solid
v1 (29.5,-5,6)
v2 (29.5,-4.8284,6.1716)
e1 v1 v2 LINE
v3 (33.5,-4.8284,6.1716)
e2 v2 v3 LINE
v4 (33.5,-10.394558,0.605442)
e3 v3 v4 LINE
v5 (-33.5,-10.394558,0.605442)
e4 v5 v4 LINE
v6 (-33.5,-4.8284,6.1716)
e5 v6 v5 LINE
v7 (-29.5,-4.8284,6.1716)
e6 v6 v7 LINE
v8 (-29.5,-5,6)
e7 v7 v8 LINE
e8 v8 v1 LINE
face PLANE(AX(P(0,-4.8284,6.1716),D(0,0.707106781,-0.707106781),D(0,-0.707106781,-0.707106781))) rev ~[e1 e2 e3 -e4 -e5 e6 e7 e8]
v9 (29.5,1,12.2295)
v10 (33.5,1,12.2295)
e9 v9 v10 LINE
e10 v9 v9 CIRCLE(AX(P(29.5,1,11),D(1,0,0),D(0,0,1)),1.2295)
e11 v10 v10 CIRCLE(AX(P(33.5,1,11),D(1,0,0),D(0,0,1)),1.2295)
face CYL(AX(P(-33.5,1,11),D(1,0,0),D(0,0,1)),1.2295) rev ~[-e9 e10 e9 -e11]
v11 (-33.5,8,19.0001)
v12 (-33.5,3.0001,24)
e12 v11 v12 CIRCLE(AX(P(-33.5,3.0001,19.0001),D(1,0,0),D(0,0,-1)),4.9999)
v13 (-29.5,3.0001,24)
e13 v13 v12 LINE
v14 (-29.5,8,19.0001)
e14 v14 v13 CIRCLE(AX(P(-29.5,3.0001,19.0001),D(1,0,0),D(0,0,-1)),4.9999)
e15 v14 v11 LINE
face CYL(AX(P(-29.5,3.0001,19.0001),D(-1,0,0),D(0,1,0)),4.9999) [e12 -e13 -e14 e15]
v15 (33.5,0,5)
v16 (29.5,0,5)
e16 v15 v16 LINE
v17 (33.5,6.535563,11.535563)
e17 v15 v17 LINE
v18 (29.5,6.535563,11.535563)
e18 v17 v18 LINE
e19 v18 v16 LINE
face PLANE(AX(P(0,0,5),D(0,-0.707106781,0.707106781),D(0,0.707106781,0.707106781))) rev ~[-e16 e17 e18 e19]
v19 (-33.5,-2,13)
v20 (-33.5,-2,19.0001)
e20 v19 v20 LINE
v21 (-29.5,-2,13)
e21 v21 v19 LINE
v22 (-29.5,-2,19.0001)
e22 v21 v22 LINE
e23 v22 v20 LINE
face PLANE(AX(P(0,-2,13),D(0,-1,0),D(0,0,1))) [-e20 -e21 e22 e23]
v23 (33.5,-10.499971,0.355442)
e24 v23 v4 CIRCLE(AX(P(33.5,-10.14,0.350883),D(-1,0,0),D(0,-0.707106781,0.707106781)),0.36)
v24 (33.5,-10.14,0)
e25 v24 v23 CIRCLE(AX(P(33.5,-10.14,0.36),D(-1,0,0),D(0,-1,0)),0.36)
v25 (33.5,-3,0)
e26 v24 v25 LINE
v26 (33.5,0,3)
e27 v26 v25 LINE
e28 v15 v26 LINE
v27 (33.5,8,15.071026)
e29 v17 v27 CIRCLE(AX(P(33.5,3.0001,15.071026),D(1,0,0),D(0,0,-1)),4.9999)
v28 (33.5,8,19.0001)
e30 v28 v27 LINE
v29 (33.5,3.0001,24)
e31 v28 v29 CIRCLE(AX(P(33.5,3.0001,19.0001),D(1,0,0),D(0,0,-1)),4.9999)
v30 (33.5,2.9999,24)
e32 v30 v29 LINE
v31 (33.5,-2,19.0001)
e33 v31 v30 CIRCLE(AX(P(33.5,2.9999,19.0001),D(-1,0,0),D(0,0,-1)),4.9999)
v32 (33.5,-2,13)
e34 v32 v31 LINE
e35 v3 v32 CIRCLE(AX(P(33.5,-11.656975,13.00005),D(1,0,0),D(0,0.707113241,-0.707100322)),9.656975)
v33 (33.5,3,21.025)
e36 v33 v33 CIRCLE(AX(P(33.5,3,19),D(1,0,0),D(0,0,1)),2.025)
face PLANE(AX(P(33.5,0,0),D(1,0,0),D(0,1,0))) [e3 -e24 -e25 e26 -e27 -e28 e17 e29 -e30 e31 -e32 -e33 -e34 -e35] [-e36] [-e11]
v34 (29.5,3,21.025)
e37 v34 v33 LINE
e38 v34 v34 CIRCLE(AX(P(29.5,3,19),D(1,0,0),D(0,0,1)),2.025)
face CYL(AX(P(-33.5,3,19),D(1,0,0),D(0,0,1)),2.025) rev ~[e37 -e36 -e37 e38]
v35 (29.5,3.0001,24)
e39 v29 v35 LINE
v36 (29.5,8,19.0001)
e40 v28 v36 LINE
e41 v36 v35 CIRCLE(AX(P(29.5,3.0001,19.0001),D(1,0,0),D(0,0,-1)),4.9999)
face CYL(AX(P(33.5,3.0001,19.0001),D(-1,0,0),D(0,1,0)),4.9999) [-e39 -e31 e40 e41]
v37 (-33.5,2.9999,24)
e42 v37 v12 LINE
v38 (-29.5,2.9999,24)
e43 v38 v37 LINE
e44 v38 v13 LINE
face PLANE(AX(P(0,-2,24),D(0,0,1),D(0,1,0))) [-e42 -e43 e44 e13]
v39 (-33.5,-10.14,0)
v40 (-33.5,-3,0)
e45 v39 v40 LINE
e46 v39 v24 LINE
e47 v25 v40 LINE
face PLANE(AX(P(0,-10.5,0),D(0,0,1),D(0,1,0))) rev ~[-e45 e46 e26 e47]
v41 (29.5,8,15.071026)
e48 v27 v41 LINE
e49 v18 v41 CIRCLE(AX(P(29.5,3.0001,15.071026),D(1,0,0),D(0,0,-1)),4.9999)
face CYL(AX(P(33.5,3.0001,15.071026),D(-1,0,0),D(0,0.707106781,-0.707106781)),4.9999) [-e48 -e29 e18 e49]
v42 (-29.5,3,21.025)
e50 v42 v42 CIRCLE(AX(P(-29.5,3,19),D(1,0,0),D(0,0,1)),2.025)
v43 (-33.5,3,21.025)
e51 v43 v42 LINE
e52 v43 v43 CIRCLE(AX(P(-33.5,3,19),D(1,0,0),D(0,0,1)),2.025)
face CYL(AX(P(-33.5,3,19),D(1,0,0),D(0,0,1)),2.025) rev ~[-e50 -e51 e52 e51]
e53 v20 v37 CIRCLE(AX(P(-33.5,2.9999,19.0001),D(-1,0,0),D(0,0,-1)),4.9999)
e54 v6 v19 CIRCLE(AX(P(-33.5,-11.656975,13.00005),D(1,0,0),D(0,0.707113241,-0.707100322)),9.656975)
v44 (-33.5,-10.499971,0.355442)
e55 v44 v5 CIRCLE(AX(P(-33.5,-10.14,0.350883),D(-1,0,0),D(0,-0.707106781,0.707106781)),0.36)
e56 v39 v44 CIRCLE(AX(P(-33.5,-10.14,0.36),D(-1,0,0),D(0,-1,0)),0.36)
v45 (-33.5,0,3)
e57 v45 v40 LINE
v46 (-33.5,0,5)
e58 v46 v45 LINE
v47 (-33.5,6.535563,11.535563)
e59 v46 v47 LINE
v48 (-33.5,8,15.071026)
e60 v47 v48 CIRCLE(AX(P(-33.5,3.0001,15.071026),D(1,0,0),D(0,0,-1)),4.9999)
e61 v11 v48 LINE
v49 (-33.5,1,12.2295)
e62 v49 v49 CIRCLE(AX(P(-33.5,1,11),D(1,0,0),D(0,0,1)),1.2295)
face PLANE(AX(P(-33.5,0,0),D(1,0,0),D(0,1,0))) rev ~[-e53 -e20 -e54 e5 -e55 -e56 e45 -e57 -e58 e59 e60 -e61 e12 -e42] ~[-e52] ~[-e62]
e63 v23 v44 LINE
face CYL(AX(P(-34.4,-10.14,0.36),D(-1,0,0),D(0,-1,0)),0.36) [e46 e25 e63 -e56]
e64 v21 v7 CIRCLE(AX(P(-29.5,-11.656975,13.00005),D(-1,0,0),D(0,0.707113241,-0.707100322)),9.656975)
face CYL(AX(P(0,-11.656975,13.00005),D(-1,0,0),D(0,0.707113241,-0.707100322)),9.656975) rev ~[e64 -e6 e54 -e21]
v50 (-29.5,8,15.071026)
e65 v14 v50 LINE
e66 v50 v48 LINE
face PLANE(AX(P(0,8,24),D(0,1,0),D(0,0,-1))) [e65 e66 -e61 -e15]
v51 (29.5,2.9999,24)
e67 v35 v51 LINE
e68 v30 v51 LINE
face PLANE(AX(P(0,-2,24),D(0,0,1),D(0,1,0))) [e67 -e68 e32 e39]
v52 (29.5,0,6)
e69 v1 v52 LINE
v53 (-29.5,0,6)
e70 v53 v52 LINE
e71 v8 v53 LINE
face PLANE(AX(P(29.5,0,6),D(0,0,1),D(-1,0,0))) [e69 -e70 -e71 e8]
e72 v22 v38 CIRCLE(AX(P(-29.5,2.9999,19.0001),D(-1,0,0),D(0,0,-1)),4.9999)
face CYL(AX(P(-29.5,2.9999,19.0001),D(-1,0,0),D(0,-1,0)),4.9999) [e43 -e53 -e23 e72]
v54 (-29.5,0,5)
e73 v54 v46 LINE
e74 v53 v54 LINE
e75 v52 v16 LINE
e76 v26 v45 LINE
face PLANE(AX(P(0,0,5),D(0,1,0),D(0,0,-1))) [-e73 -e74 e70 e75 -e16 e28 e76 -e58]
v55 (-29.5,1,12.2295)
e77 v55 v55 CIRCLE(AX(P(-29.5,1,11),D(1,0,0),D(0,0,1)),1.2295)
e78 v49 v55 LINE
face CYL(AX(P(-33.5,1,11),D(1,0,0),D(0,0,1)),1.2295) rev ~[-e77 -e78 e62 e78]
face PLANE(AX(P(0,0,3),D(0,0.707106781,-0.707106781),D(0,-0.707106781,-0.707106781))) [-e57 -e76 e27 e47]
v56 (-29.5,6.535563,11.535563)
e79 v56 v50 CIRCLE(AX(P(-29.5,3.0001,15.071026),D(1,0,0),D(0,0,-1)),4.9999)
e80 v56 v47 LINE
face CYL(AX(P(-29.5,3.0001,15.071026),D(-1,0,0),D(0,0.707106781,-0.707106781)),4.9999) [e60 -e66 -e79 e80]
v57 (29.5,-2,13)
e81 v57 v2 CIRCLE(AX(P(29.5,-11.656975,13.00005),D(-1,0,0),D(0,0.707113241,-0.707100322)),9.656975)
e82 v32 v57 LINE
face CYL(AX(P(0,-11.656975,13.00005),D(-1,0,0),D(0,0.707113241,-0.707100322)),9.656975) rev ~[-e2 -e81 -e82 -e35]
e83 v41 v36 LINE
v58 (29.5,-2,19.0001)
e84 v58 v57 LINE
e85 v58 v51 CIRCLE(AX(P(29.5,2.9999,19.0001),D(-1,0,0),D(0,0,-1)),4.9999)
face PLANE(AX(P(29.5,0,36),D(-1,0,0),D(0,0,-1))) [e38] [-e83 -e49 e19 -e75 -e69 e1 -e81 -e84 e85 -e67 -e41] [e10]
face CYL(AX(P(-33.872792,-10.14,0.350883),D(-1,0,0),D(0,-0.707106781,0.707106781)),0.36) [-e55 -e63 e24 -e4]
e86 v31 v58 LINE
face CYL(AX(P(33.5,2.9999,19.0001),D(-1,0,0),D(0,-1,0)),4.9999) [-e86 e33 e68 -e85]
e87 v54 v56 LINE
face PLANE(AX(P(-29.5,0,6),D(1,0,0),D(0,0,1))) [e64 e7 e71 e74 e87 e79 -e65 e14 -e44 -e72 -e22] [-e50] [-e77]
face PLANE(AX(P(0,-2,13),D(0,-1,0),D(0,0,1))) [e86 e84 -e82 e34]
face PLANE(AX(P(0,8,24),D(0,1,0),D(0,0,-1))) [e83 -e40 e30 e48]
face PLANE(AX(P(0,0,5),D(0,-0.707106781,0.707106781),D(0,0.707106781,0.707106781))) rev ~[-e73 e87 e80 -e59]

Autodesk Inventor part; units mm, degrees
ref_plane "YZ Plane" through (0, 0, 0) normal (1, 0, 0) x (0, 1, 0)
ref_plane "XZ Plane" through (0, 0, 0) normal (0, 1, 0) x (-1, 0, 0)
ref_plane "XY Plane" through (0, 0, 0) normal (0, 0, 1) x (1, 0, 0)
sketch "Skizze1" plane through (0, 0, 0) normal (1, 0, 0) x (0, 1, 0)
  line L0 (-4.8284, 6.1716) -> (-10.5, 0.5)
  line L1 (-10.5, 0) -> (-3, 0)
  line L2 (-10.5, 0.5) -> (-10.5, 0)
  line L3 (0, 5) -> (8, 13)
  circle A0 centre (3, 19) radius 0.5
  line L4 (-2, 13) -> (-2, 24)
  line L5 (-2, 24) -> (8, 24)
  line L6 (8, 24) -> (8, 13)
  line L7 (0, 3) -> (-3, 0)
  line L8 (8, 13) -> (-2, 13) construction
  arc A1 (-4.8284, 6.1716) -> (-2, 13) centre (-11.6569, 13) ccw
  line L9 (0, 5) -> (0, 3)
  line L10 (3, 19) -> (3, 0) construction
  point P0 (0, 0)
  dimension "d40" = 0.5
  dimension "d44" = 1
  dimension "d59" = 10
  dimension "d60" = 45
  dimension "d61" = 5
  dimension "d63" = 45
  dimension "d78" = 3
  dimension "d79" = 10.5
  dimension "d80" = 0
  dimension "d81" = 19
  dimension "d82" = 5
  dimension "d83" = 3
extrude "Extrusion1" add sketch "Skizze1" along normal mid plane 67
sketch "Skizze6" plane through (0, 0, 0) normal (0, 1, 0) x (-1, 0, 0)
  line L0 (33.5, 0.5) -> (-33.5, 0.5) projected
  line L1 (-33.5, 6.1716) -> (-33.5, 0.5) projected
  line L2 (33.5, 0.5) -> (33.5, 6.1716) projected
  line L3 (-29.5, 6) -> (29.5, 6)
  line L4 (29.5, 6) -> (29.5, 36)
  line L5 (29.5, 36) -> (-29.5, 36)
  line L6 (-29.5, 36) -> (-29.5, 6)
  line L7 (0, -7.2) -> (0, 43.2) projected
  line L8 (33.5, 0) -> (-33.5, 0) projected
  line L9 (-33.5, 0) -> (33.5, 0) projected
  point P0 (0, 0)
  point P1 (-33, 10)
  point P2 (33, 10)
  dimension "d45" = 4
  dimension "d46" = 30
  dimension "d50" = 6
extrude "Extrusion4" cut sketch "Skizze6" along normal through all both and the other way through all
sketch "Skizze3" plane through (-33.5, 0, 0) normal (-1, 0, 0) x (0, 0, 1)
  line L0 (0, -3) -> (0, -10.5) projected
  line L1 (0.5, -10.5) -> (6.1716, -4.8284) projected
  line L2 (0, -10.5) -> (0, 0) construction
  line L3 (0, 11.9314) -> (0, -15.5882) projected
  line L4 (0, -10.5) -> (0.5, -10.5) projected
  line L5 (13, 8) -> (5, 0) projected
  line L6 (13, -2) -> (24, -2) projected
  line L7 (24, -2) -> (24, 8) projected
  line L8 (24, 8) -> (13, 8) projected
  circle A0 centre (19, 3) radius 0.5 projected
  line L9 (3, 0) -> (0, -3) projected
  arc A1 (13, -2) -> (6.1716, -4.8284) centre (13, -11.6569) ccw projected
  line L10 (5, 0) -> (3, 0) projected
hole "Bohrung1" at (-33.5, 3, 19) direction (1, 0, 0) diameter 4.05 end through all
sketch "Skizze4" plane through (-33.5, 0, 0) normal (-1, 0, 0) x (0, 0, 1)
  line L0 (0, 11.7) -> (0, -14.2) projected
  line L1 (-5.8, 0) -> (34.8, 0) projected
  point P0 (29, 0)
  point P1 (11, 1)
  dimension "d38" = 11
  dimension "d84" = 1
hole "Bohrung2" at (-33.5, 1, 11) direction (1, 0, 0) diameter 2.459 end through all thread size "M3x0.5" class "6H" standard "ISO Metric profile"
fillet "Rundung2" radius 5 6 edges at (31.5, -2, 24) (31.5, 8, 24) (-31.5, 8, 24) (-31.5, -2, 24) (31.5, 8, 13) (-31.5, 8, 13)
fillet "Rundung7" [suppressed]
fillet "Rundung8" radius 0.36 2 edges at (0, -10.5, 0.5) (0, -10.5, 0)
sketch "Skizze7" plane through (-29.5, 1, 6) normal (0, 0, 1) x (1, 0, 0)
  line L0 (0, 0) -> (59, 0) projected
  line L1 (0, 0) -> (0, -6) projected
  line L2 (59, -6) -> (0, -6) projected
  line L3 (59, -6) -> (59, 0) projected
  line L4 (-17.4, -1) -> (76.4, -1) projected
  point P0 (29.5, -1)
  point P1 (0, -1)
  point P2 (59, -1)
extrude "Extrusion5" cut sketch "Skizze7" against normal through all contours L0 L3 L4 L1
properties part number "Chip Schaufel v2" material "Aluminium 6061"
